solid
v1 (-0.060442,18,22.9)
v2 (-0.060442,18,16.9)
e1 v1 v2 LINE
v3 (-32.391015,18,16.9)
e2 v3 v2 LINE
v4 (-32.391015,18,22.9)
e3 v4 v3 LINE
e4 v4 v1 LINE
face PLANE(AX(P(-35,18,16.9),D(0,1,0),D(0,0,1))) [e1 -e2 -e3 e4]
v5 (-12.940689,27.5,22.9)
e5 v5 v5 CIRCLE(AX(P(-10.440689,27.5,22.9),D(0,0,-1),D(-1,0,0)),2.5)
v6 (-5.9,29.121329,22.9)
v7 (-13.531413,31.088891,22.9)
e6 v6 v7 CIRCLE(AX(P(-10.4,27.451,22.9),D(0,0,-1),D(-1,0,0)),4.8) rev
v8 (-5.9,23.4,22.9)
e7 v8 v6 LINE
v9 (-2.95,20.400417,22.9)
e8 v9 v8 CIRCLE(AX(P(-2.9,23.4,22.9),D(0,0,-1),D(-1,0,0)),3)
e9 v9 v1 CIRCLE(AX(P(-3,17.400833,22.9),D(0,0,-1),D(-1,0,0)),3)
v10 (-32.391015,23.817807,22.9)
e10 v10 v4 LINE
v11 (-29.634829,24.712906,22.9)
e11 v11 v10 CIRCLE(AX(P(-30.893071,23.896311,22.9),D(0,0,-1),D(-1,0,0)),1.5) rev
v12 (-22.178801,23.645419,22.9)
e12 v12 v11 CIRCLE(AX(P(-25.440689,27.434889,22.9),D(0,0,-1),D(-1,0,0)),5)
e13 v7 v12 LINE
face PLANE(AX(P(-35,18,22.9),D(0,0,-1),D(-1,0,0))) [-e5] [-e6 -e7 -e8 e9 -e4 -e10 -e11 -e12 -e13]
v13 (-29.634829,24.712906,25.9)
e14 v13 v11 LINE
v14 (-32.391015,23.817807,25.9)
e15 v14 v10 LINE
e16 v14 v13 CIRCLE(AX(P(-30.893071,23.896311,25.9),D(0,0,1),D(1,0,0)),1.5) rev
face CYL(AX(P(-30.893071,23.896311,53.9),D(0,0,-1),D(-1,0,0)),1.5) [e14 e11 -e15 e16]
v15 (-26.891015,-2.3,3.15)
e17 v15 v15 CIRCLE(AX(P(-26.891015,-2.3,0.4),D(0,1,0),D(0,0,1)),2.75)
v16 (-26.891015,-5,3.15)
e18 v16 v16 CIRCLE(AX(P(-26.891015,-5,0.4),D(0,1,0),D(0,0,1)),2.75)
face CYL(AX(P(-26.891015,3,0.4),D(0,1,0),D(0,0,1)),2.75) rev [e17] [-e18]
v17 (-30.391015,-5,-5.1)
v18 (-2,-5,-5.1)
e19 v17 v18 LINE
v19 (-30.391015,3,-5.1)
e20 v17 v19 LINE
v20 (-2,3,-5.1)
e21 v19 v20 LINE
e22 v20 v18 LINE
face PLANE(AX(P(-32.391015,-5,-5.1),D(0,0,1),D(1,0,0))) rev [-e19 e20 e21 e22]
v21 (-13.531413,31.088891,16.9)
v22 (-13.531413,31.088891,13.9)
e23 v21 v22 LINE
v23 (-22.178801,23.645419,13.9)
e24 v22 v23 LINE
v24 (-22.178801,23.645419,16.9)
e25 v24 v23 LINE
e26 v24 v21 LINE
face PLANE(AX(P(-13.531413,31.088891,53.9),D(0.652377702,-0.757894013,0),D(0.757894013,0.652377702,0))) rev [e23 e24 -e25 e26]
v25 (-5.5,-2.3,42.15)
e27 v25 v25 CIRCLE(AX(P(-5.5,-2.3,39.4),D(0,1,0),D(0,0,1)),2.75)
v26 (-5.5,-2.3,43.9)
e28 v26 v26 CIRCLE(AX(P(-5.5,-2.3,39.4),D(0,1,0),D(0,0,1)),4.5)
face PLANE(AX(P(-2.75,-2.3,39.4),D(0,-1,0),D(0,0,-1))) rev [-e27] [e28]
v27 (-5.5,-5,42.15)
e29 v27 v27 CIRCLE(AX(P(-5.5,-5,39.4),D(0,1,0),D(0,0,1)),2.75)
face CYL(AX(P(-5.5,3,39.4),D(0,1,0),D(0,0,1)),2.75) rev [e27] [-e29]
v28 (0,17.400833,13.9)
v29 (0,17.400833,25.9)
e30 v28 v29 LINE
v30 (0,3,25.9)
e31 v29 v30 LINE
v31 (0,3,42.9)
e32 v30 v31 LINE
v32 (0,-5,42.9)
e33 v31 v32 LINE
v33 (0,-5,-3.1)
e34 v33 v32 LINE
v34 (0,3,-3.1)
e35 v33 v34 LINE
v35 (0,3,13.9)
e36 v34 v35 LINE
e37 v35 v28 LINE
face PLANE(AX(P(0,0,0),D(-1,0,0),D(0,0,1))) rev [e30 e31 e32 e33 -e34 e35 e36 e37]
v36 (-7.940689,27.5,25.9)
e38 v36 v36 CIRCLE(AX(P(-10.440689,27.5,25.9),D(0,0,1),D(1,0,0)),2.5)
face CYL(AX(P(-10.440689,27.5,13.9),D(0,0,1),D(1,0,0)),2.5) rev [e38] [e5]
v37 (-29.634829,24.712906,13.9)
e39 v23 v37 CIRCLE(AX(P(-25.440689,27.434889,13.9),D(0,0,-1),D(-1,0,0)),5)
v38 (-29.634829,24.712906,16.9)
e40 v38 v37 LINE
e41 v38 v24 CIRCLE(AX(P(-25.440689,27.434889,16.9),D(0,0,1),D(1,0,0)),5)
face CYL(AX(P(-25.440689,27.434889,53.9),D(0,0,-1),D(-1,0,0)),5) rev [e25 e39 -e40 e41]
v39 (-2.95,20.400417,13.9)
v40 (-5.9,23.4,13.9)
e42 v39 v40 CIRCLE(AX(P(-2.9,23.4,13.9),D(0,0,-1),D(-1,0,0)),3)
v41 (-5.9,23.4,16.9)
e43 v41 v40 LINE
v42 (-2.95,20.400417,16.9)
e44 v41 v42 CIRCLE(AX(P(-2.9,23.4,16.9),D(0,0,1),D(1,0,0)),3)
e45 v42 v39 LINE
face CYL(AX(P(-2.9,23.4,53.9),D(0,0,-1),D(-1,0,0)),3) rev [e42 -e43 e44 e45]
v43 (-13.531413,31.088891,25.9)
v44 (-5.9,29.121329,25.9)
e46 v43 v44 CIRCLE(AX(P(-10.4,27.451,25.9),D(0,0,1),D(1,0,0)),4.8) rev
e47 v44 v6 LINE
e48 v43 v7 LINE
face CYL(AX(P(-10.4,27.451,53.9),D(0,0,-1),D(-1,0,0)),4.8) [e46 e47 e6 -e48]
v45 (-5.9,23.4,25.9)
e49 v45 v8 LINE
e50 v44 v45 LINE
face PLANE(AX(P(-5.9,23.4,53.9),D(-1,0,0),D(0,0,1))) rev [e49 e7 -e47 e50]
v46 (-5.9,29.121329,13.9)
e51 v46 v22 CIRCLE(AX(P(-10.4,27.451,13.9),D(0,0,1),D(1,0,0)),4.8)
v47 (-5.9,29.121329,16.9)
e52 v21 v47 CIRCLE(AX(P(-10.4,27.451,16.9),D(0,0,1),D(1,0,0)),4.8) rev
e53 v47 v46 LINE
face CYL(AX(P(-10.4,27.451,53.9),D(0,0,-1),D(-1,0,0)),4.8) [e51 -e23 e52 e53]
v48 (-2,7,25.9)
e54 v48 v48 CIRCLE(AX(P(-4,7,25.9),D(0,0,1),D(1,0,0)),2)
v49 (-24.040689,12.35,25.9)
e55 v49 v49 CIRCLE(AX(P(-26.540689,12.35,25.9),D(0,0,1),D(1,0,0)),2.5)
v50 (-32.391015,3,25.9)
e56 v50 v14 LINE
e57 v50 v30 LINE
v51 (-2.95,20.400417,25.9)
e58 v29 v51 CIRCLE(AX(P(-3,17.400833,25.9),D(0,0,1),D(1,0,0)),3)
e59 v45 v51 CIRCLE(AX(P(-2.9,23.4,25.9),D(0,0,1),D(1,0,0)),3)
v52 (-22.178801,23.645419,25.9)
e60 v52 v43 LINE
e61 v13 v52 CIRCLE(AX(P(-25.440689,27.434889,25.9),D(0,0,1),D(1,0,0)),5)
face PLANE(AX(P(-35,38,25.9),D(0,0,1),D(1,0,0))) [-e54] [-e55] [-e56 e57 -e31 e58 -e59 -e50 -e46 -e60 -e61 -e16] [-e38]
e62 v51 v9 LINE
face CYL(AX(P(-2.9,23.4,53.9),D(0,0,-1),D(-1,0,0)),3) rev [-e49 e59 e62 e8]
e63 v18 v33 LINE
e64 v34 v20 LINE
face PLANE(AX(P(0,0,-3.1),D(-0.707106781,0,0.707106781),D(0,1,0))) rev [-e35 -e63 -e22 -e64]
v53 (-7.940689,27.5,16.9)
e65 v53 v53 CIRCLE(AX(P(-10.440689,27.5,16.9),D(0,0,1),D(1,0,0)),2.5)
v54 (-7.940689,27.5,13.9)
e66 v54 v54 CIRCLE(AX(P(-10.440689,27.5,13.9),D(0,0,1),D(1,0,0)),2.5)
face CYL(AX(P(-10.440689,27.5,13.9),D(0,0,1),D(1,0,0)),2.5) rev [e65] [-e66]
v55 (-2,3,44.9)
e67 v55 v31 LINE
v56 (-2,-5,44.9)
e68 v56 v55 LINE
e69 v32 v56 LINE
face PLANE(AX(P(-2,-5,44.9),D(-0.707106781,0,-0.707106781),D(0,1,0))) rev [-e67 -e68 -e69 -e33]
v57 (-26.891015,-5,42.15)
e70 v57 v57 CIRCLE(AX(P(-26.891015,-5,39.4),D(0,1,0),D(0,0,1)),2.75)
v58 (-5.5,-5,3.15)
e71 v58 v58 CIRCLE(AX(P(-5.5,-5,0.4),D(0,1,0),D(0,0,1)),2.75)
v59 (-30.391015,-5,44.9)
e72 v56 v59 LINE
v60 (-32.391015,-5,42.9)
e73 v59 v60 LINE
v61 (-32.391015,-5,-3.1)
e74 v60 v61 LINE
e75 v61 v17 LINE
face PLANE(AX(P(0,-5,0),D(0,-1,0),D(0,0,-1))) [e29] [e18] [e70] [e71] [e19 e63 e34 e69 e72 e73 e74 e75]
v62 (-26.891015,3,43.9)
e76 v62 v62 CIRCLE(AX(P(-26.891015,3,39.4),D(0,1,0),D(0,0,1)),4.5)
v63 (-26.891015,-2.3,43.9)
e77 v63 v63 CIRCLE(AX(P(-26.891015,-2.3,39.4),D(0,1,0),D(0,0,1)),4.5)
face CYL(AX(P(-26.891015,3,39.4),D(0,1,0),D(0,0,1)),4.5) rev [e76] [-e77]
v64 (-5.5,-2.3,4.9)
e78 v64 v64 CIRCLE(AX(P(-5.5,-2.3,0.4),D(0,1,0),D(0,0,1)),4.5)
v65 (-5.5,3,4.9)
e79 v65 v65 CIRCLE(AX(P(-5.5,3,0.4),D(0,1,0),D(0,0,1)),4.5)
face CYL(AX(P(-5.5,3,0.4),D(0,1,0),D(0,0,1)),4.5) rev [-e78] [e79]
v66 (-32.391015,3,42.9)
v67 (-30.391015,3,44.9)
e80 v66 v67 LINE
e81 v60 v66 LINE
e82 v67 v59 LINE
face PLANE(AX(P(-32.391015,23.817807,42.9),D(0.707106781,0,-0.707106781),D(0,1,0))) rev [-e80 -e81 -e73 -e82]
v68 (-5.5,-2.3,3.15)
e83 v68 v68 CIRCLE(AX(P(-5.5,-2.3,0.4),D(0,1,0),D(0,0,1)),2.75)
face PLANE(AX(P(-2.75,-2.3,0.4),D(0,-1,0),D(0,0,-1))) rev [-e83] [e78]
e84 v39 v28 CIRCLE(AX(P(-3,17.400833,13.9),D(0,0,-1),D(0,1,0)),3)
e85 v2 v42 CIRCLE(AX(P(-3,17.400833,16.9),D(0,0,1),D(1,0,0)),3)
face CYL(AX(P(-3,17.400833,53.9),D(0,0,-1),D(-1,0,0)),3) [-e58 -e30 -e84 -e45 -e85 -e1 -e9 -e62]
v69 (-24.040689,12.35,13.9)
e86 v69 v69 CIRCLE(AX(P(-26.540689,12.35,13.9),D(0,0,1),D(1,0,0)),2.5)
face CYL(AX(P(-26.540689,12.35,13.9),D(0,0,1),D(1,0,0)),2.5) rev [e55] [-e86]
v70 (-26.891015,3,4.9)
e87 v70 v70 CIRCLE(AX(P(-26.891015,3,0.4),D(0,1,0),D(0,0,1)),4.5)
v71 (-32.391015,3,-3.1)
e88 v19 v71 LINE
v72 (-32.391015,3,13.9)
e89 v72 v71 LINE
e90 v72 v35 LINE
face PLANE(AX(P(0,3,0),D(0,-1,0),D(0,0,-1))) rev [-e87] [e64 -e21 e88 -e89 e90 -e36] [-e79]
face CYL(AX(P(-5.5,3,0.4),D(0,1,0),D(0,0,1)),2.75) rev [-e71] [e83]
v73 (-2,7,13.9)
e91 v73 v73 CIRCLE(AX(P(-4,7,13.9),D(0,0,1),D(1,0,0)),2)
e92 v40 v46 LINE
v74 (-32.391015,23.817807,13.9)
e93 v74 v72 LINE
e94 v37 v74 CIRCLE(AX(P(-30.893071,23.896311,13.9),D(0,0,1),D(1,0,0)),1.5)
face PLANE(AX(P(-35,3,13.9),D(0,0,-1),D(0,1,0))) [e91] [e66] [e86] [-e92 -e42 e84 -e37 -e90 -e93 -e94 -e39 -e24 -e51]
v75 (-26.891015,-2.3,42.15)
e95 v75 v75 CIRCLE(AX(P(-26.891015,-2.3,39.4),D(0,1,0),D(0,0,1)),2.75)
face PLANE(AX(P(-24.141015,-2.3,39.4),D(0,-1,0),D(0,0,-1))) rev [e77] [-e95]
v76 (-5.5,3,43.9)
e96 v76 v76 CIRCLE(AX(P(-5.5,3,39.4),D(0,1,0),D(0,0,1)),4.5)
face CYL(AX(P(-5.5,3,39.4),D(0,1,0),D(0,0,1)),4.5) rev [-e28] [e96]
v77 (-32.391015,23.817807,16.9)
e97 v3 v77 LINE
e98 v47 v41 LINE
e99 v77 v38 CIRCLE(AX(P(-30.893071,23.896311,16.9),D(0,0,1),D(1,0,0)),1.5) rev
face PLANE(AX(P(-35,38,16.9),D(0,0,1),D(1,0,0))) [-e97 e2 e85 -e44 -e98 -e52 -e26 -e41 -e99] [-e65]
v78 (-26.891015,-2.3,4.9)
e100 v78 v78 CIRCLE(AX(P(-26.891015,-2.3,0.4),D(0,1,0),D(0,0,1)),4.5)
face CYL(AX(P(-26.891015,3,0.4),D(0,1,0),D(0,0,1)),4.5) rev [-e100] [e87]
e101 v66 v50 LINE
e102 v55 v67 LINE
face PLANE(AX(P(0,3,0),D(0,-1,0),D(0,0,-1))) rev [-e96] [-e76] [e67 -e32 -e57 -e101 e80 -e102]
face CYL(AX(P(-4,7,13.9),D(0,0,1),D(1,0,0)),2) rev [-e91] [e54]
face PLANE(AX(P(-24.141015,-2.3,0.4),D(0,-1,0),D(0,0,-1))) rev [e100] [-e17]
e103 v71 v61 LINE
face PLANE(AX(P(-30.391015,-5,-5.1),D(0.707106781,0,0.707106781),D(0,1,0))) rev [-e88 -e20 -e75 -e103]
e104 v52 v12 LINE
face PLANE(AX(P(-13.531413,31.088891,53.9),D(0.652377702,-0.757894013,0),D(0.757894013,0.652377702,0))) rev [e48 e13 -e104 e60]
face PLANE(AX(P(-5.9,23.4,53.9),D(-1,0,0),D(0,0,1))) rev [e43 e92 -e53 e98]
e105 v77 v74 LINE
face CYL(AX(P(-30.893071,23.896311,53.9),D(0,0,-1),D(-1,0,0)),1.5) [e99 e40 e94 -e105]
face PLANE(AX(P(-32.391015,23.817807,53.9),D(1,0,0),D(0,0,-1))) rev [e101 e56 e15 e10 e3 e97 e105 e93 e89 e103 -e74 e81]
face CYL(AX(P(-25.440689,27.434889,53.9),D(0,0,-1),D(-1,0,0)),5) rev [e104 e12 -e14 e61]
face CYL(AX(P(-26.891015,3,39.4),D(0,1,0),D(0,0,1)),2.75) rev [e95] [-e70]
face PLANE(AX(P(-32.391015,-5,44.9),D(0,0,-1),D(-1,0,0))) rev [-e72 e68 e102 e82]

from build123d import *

# Parameters (mm, degrees)
EXTRUDE_1_DEPTH              = 35
SKETCH_2_W                   = 82.468710257
SKETCH_2_H                   = 88.660900106
CUT_EXTRUDE_1_DEPTH          = 40
SKETCH_10_R                  = 2.5
CUT_EXTRUDE_6_DEPTH          = 48.259263975
SKETCH_11_R                  = 2.5
CUT_EXTRUDE_7_DEPTH          = 48.259263975
SKETCH_13_R                  = 2
CUT_EXTRUDE_8_DEPTH          = 48.259263975
FILLET_1_R                   = 3
SKETCH_14_W                  = 32.391015019
SKETCH_14_H                  = 50
EXTRUDE_2_DEPTH              = 8
CHAMFER_1_SIZE               = 2
HOLE_WIZARD_M5_1_D           = 5.5
HOLE_WIZARD_M5_1_CBORE_D     = 9
HOLE_WIZARD_M5_1_CBORE_DEPTH = 5.3


with BuildPart() as part:
    # 草圖1 → 填料-伸長1 (new body)
    with BuildSketch(Plane(origin=(0, 0, 0), x_dir=(0, 0, -1), z_dir=(1, 0, 0))):
        Polygon((-13.9, 3), (-25.9, 3), (-25.9, 38), (-22.9, 38), (-22.9, 18), (-16.9, 18), (-16.9, 38), (-13.9, 38), align=None)
    extrude(amount=-EXTRUDE_1_DEPTH)

    # 草圖2 → 除料-伸長1 (cut)
    with BuildSketch(Plane.XY.offset(13.9)):
        with Locations((-13.573394444, 11.892084287)):
            Rectangle(SKETCH_2_W, SKETCH_2_H)
        with BuildLine():
            Line((-32.391015019, 23.817806702), (-32.391015019, 3))
            Line((-32.391015019, 3), (0, 3))
            Line((0, 3), (0, 20.4))
            Line((0, 20.4), (-2.9, 20.4))
            ThreePointArc((-2.9, 20.4), (-5.021320344, 21.278679656), (-5.9, 23.4))
            Line((-5.9, 23.4), (-5.9, 29.121329309))
            ThreePointArc((-5.9, 29.121329309), (-9.201633351, 32.099001439), (-13.531412968, 31.088891261))
            Line((-13.531412968, 31.088891261), (-22.178800852, 23.645419036))
            ThreePointArc((-22.178800852, 23.645419036), (-26.149318252, 22.485359315), (-29.634828865, 24.712905667))
            ThreePointArc((-29.634828865, 24.712905667), (-31.356390105, 25.322962362), (-32.391015019, 23.817806702))
        make_face(mode=Mode.SUBTRACT)
    extrude(amount=CUT_EXTRUDE_1_DEPTH, mode=Mode.SUBTRACT)

    # 草圖10 → 除料-伸長6 (cut, through all)
    with BuildSketch(Plane.XY.offset(25.9)):
        with Locations((-10.44068936, 27.5)):
            Circle(SKETCH_10_R)
    extrude(amount=-CUT_EXTRUDE_6_DEPTH, mode=Mode.SUBTRACT)

    # 草圖11 → 除料-伸長7 (cut, through all)
    with BuildSketch(Plane.XY.offset(25.9)):
        with Locations((-26.54068936, 12.35)):
            Circle(SKETCH_11_R)
    extrude(amount=-CUT_EXTRUDE_7_DEPTH, mode=Mode.SUBTRACT)

    # 草圖13 → 除料-伸長8 (cut, through all)
    with BuildSketch(Plane.XY.offset(25.9)):
        with Locations((-4, 7)):
            Circle(SKETCH_13_R)
    extrude(amount=-CUT_EXTRUDE_8_DEPTH, mode=Mode.SUBTRACT)

    # 圓角1
    # the kernel refuses this fillet: 3 mm, written as the material it takes off along each edge
    with BuildSketch(Plane(origin=(0, 20.4, 15.402083478), x_dir=(0, -1, 0), z_dir=(0, 0, 1)), Plane(origin=(0, 20.4, 6.402083478), x_dir=(0, -1, 0), z_dir=(0, 0, 1))) as fillet_1_piece_1:
        with BuildLine():
            CenterArc((2.999166609, -3), FILLET_1_R, 90, 89.045026126)
            Line((-0.000416696, -2.95), (-0.300375026, -2.945))
            ThreePointArc((-0.300375026, -2.945), (-0.3, -2.9), (-0.3, 0))
            Line((-0.3, 0), (0, 0.3))
            Line((0, 0.3), (2.999166609, 0.3))
            Line((2.999166609, 0.3), (2.999166609, 0))
        make_face()
    extrude(amount=17.995833044, mode=Mode.SUBTRACT)

    # 草圖14 → 填料-伸長2 (add)
    with BuildSketch(Plane.XZ.offset(-3)):
        with Locations((-16.19550751, 19.9)):
            Rectangle(SKETCH_14_W, SKETCH_14_H)
    extrude(amount=EXTRUDE_2_DEPTH)

    # 導角1
    chamfer_1_edges = [part.edges().sort_by_distance(p)[0] for p in [
        (-32.391015019, -1, -5.1),
        (0, -1, -5.1),
        (-32.391015019, -1, 44.9),
        (0, -1, 44.9),
    ]]
    chamfer(chamfer_1_edges, length=CHAMFER_1_SIZE)

    # M5 內六角圓柱頭螺釘的柱孔1 (through all)
    with Locations(Plane(origin=(0, 3, 0), x_dir=(1, 0, 0), z_dir=(0, 1, 0))):
        with Locations((-26.891015019, -0.4), (-5.5, -0.4), (-5.5, -39.4), (-26.891015019, -39.4)):
            CounterBoreHole(HOLE_WIZARD_M5_1_D / 2, HOLE_WIZARD_M5_1_CBORE_D / 2, HOLE_WIZARD_M5_1_CBORE_DEPTH)


solid = part.part
